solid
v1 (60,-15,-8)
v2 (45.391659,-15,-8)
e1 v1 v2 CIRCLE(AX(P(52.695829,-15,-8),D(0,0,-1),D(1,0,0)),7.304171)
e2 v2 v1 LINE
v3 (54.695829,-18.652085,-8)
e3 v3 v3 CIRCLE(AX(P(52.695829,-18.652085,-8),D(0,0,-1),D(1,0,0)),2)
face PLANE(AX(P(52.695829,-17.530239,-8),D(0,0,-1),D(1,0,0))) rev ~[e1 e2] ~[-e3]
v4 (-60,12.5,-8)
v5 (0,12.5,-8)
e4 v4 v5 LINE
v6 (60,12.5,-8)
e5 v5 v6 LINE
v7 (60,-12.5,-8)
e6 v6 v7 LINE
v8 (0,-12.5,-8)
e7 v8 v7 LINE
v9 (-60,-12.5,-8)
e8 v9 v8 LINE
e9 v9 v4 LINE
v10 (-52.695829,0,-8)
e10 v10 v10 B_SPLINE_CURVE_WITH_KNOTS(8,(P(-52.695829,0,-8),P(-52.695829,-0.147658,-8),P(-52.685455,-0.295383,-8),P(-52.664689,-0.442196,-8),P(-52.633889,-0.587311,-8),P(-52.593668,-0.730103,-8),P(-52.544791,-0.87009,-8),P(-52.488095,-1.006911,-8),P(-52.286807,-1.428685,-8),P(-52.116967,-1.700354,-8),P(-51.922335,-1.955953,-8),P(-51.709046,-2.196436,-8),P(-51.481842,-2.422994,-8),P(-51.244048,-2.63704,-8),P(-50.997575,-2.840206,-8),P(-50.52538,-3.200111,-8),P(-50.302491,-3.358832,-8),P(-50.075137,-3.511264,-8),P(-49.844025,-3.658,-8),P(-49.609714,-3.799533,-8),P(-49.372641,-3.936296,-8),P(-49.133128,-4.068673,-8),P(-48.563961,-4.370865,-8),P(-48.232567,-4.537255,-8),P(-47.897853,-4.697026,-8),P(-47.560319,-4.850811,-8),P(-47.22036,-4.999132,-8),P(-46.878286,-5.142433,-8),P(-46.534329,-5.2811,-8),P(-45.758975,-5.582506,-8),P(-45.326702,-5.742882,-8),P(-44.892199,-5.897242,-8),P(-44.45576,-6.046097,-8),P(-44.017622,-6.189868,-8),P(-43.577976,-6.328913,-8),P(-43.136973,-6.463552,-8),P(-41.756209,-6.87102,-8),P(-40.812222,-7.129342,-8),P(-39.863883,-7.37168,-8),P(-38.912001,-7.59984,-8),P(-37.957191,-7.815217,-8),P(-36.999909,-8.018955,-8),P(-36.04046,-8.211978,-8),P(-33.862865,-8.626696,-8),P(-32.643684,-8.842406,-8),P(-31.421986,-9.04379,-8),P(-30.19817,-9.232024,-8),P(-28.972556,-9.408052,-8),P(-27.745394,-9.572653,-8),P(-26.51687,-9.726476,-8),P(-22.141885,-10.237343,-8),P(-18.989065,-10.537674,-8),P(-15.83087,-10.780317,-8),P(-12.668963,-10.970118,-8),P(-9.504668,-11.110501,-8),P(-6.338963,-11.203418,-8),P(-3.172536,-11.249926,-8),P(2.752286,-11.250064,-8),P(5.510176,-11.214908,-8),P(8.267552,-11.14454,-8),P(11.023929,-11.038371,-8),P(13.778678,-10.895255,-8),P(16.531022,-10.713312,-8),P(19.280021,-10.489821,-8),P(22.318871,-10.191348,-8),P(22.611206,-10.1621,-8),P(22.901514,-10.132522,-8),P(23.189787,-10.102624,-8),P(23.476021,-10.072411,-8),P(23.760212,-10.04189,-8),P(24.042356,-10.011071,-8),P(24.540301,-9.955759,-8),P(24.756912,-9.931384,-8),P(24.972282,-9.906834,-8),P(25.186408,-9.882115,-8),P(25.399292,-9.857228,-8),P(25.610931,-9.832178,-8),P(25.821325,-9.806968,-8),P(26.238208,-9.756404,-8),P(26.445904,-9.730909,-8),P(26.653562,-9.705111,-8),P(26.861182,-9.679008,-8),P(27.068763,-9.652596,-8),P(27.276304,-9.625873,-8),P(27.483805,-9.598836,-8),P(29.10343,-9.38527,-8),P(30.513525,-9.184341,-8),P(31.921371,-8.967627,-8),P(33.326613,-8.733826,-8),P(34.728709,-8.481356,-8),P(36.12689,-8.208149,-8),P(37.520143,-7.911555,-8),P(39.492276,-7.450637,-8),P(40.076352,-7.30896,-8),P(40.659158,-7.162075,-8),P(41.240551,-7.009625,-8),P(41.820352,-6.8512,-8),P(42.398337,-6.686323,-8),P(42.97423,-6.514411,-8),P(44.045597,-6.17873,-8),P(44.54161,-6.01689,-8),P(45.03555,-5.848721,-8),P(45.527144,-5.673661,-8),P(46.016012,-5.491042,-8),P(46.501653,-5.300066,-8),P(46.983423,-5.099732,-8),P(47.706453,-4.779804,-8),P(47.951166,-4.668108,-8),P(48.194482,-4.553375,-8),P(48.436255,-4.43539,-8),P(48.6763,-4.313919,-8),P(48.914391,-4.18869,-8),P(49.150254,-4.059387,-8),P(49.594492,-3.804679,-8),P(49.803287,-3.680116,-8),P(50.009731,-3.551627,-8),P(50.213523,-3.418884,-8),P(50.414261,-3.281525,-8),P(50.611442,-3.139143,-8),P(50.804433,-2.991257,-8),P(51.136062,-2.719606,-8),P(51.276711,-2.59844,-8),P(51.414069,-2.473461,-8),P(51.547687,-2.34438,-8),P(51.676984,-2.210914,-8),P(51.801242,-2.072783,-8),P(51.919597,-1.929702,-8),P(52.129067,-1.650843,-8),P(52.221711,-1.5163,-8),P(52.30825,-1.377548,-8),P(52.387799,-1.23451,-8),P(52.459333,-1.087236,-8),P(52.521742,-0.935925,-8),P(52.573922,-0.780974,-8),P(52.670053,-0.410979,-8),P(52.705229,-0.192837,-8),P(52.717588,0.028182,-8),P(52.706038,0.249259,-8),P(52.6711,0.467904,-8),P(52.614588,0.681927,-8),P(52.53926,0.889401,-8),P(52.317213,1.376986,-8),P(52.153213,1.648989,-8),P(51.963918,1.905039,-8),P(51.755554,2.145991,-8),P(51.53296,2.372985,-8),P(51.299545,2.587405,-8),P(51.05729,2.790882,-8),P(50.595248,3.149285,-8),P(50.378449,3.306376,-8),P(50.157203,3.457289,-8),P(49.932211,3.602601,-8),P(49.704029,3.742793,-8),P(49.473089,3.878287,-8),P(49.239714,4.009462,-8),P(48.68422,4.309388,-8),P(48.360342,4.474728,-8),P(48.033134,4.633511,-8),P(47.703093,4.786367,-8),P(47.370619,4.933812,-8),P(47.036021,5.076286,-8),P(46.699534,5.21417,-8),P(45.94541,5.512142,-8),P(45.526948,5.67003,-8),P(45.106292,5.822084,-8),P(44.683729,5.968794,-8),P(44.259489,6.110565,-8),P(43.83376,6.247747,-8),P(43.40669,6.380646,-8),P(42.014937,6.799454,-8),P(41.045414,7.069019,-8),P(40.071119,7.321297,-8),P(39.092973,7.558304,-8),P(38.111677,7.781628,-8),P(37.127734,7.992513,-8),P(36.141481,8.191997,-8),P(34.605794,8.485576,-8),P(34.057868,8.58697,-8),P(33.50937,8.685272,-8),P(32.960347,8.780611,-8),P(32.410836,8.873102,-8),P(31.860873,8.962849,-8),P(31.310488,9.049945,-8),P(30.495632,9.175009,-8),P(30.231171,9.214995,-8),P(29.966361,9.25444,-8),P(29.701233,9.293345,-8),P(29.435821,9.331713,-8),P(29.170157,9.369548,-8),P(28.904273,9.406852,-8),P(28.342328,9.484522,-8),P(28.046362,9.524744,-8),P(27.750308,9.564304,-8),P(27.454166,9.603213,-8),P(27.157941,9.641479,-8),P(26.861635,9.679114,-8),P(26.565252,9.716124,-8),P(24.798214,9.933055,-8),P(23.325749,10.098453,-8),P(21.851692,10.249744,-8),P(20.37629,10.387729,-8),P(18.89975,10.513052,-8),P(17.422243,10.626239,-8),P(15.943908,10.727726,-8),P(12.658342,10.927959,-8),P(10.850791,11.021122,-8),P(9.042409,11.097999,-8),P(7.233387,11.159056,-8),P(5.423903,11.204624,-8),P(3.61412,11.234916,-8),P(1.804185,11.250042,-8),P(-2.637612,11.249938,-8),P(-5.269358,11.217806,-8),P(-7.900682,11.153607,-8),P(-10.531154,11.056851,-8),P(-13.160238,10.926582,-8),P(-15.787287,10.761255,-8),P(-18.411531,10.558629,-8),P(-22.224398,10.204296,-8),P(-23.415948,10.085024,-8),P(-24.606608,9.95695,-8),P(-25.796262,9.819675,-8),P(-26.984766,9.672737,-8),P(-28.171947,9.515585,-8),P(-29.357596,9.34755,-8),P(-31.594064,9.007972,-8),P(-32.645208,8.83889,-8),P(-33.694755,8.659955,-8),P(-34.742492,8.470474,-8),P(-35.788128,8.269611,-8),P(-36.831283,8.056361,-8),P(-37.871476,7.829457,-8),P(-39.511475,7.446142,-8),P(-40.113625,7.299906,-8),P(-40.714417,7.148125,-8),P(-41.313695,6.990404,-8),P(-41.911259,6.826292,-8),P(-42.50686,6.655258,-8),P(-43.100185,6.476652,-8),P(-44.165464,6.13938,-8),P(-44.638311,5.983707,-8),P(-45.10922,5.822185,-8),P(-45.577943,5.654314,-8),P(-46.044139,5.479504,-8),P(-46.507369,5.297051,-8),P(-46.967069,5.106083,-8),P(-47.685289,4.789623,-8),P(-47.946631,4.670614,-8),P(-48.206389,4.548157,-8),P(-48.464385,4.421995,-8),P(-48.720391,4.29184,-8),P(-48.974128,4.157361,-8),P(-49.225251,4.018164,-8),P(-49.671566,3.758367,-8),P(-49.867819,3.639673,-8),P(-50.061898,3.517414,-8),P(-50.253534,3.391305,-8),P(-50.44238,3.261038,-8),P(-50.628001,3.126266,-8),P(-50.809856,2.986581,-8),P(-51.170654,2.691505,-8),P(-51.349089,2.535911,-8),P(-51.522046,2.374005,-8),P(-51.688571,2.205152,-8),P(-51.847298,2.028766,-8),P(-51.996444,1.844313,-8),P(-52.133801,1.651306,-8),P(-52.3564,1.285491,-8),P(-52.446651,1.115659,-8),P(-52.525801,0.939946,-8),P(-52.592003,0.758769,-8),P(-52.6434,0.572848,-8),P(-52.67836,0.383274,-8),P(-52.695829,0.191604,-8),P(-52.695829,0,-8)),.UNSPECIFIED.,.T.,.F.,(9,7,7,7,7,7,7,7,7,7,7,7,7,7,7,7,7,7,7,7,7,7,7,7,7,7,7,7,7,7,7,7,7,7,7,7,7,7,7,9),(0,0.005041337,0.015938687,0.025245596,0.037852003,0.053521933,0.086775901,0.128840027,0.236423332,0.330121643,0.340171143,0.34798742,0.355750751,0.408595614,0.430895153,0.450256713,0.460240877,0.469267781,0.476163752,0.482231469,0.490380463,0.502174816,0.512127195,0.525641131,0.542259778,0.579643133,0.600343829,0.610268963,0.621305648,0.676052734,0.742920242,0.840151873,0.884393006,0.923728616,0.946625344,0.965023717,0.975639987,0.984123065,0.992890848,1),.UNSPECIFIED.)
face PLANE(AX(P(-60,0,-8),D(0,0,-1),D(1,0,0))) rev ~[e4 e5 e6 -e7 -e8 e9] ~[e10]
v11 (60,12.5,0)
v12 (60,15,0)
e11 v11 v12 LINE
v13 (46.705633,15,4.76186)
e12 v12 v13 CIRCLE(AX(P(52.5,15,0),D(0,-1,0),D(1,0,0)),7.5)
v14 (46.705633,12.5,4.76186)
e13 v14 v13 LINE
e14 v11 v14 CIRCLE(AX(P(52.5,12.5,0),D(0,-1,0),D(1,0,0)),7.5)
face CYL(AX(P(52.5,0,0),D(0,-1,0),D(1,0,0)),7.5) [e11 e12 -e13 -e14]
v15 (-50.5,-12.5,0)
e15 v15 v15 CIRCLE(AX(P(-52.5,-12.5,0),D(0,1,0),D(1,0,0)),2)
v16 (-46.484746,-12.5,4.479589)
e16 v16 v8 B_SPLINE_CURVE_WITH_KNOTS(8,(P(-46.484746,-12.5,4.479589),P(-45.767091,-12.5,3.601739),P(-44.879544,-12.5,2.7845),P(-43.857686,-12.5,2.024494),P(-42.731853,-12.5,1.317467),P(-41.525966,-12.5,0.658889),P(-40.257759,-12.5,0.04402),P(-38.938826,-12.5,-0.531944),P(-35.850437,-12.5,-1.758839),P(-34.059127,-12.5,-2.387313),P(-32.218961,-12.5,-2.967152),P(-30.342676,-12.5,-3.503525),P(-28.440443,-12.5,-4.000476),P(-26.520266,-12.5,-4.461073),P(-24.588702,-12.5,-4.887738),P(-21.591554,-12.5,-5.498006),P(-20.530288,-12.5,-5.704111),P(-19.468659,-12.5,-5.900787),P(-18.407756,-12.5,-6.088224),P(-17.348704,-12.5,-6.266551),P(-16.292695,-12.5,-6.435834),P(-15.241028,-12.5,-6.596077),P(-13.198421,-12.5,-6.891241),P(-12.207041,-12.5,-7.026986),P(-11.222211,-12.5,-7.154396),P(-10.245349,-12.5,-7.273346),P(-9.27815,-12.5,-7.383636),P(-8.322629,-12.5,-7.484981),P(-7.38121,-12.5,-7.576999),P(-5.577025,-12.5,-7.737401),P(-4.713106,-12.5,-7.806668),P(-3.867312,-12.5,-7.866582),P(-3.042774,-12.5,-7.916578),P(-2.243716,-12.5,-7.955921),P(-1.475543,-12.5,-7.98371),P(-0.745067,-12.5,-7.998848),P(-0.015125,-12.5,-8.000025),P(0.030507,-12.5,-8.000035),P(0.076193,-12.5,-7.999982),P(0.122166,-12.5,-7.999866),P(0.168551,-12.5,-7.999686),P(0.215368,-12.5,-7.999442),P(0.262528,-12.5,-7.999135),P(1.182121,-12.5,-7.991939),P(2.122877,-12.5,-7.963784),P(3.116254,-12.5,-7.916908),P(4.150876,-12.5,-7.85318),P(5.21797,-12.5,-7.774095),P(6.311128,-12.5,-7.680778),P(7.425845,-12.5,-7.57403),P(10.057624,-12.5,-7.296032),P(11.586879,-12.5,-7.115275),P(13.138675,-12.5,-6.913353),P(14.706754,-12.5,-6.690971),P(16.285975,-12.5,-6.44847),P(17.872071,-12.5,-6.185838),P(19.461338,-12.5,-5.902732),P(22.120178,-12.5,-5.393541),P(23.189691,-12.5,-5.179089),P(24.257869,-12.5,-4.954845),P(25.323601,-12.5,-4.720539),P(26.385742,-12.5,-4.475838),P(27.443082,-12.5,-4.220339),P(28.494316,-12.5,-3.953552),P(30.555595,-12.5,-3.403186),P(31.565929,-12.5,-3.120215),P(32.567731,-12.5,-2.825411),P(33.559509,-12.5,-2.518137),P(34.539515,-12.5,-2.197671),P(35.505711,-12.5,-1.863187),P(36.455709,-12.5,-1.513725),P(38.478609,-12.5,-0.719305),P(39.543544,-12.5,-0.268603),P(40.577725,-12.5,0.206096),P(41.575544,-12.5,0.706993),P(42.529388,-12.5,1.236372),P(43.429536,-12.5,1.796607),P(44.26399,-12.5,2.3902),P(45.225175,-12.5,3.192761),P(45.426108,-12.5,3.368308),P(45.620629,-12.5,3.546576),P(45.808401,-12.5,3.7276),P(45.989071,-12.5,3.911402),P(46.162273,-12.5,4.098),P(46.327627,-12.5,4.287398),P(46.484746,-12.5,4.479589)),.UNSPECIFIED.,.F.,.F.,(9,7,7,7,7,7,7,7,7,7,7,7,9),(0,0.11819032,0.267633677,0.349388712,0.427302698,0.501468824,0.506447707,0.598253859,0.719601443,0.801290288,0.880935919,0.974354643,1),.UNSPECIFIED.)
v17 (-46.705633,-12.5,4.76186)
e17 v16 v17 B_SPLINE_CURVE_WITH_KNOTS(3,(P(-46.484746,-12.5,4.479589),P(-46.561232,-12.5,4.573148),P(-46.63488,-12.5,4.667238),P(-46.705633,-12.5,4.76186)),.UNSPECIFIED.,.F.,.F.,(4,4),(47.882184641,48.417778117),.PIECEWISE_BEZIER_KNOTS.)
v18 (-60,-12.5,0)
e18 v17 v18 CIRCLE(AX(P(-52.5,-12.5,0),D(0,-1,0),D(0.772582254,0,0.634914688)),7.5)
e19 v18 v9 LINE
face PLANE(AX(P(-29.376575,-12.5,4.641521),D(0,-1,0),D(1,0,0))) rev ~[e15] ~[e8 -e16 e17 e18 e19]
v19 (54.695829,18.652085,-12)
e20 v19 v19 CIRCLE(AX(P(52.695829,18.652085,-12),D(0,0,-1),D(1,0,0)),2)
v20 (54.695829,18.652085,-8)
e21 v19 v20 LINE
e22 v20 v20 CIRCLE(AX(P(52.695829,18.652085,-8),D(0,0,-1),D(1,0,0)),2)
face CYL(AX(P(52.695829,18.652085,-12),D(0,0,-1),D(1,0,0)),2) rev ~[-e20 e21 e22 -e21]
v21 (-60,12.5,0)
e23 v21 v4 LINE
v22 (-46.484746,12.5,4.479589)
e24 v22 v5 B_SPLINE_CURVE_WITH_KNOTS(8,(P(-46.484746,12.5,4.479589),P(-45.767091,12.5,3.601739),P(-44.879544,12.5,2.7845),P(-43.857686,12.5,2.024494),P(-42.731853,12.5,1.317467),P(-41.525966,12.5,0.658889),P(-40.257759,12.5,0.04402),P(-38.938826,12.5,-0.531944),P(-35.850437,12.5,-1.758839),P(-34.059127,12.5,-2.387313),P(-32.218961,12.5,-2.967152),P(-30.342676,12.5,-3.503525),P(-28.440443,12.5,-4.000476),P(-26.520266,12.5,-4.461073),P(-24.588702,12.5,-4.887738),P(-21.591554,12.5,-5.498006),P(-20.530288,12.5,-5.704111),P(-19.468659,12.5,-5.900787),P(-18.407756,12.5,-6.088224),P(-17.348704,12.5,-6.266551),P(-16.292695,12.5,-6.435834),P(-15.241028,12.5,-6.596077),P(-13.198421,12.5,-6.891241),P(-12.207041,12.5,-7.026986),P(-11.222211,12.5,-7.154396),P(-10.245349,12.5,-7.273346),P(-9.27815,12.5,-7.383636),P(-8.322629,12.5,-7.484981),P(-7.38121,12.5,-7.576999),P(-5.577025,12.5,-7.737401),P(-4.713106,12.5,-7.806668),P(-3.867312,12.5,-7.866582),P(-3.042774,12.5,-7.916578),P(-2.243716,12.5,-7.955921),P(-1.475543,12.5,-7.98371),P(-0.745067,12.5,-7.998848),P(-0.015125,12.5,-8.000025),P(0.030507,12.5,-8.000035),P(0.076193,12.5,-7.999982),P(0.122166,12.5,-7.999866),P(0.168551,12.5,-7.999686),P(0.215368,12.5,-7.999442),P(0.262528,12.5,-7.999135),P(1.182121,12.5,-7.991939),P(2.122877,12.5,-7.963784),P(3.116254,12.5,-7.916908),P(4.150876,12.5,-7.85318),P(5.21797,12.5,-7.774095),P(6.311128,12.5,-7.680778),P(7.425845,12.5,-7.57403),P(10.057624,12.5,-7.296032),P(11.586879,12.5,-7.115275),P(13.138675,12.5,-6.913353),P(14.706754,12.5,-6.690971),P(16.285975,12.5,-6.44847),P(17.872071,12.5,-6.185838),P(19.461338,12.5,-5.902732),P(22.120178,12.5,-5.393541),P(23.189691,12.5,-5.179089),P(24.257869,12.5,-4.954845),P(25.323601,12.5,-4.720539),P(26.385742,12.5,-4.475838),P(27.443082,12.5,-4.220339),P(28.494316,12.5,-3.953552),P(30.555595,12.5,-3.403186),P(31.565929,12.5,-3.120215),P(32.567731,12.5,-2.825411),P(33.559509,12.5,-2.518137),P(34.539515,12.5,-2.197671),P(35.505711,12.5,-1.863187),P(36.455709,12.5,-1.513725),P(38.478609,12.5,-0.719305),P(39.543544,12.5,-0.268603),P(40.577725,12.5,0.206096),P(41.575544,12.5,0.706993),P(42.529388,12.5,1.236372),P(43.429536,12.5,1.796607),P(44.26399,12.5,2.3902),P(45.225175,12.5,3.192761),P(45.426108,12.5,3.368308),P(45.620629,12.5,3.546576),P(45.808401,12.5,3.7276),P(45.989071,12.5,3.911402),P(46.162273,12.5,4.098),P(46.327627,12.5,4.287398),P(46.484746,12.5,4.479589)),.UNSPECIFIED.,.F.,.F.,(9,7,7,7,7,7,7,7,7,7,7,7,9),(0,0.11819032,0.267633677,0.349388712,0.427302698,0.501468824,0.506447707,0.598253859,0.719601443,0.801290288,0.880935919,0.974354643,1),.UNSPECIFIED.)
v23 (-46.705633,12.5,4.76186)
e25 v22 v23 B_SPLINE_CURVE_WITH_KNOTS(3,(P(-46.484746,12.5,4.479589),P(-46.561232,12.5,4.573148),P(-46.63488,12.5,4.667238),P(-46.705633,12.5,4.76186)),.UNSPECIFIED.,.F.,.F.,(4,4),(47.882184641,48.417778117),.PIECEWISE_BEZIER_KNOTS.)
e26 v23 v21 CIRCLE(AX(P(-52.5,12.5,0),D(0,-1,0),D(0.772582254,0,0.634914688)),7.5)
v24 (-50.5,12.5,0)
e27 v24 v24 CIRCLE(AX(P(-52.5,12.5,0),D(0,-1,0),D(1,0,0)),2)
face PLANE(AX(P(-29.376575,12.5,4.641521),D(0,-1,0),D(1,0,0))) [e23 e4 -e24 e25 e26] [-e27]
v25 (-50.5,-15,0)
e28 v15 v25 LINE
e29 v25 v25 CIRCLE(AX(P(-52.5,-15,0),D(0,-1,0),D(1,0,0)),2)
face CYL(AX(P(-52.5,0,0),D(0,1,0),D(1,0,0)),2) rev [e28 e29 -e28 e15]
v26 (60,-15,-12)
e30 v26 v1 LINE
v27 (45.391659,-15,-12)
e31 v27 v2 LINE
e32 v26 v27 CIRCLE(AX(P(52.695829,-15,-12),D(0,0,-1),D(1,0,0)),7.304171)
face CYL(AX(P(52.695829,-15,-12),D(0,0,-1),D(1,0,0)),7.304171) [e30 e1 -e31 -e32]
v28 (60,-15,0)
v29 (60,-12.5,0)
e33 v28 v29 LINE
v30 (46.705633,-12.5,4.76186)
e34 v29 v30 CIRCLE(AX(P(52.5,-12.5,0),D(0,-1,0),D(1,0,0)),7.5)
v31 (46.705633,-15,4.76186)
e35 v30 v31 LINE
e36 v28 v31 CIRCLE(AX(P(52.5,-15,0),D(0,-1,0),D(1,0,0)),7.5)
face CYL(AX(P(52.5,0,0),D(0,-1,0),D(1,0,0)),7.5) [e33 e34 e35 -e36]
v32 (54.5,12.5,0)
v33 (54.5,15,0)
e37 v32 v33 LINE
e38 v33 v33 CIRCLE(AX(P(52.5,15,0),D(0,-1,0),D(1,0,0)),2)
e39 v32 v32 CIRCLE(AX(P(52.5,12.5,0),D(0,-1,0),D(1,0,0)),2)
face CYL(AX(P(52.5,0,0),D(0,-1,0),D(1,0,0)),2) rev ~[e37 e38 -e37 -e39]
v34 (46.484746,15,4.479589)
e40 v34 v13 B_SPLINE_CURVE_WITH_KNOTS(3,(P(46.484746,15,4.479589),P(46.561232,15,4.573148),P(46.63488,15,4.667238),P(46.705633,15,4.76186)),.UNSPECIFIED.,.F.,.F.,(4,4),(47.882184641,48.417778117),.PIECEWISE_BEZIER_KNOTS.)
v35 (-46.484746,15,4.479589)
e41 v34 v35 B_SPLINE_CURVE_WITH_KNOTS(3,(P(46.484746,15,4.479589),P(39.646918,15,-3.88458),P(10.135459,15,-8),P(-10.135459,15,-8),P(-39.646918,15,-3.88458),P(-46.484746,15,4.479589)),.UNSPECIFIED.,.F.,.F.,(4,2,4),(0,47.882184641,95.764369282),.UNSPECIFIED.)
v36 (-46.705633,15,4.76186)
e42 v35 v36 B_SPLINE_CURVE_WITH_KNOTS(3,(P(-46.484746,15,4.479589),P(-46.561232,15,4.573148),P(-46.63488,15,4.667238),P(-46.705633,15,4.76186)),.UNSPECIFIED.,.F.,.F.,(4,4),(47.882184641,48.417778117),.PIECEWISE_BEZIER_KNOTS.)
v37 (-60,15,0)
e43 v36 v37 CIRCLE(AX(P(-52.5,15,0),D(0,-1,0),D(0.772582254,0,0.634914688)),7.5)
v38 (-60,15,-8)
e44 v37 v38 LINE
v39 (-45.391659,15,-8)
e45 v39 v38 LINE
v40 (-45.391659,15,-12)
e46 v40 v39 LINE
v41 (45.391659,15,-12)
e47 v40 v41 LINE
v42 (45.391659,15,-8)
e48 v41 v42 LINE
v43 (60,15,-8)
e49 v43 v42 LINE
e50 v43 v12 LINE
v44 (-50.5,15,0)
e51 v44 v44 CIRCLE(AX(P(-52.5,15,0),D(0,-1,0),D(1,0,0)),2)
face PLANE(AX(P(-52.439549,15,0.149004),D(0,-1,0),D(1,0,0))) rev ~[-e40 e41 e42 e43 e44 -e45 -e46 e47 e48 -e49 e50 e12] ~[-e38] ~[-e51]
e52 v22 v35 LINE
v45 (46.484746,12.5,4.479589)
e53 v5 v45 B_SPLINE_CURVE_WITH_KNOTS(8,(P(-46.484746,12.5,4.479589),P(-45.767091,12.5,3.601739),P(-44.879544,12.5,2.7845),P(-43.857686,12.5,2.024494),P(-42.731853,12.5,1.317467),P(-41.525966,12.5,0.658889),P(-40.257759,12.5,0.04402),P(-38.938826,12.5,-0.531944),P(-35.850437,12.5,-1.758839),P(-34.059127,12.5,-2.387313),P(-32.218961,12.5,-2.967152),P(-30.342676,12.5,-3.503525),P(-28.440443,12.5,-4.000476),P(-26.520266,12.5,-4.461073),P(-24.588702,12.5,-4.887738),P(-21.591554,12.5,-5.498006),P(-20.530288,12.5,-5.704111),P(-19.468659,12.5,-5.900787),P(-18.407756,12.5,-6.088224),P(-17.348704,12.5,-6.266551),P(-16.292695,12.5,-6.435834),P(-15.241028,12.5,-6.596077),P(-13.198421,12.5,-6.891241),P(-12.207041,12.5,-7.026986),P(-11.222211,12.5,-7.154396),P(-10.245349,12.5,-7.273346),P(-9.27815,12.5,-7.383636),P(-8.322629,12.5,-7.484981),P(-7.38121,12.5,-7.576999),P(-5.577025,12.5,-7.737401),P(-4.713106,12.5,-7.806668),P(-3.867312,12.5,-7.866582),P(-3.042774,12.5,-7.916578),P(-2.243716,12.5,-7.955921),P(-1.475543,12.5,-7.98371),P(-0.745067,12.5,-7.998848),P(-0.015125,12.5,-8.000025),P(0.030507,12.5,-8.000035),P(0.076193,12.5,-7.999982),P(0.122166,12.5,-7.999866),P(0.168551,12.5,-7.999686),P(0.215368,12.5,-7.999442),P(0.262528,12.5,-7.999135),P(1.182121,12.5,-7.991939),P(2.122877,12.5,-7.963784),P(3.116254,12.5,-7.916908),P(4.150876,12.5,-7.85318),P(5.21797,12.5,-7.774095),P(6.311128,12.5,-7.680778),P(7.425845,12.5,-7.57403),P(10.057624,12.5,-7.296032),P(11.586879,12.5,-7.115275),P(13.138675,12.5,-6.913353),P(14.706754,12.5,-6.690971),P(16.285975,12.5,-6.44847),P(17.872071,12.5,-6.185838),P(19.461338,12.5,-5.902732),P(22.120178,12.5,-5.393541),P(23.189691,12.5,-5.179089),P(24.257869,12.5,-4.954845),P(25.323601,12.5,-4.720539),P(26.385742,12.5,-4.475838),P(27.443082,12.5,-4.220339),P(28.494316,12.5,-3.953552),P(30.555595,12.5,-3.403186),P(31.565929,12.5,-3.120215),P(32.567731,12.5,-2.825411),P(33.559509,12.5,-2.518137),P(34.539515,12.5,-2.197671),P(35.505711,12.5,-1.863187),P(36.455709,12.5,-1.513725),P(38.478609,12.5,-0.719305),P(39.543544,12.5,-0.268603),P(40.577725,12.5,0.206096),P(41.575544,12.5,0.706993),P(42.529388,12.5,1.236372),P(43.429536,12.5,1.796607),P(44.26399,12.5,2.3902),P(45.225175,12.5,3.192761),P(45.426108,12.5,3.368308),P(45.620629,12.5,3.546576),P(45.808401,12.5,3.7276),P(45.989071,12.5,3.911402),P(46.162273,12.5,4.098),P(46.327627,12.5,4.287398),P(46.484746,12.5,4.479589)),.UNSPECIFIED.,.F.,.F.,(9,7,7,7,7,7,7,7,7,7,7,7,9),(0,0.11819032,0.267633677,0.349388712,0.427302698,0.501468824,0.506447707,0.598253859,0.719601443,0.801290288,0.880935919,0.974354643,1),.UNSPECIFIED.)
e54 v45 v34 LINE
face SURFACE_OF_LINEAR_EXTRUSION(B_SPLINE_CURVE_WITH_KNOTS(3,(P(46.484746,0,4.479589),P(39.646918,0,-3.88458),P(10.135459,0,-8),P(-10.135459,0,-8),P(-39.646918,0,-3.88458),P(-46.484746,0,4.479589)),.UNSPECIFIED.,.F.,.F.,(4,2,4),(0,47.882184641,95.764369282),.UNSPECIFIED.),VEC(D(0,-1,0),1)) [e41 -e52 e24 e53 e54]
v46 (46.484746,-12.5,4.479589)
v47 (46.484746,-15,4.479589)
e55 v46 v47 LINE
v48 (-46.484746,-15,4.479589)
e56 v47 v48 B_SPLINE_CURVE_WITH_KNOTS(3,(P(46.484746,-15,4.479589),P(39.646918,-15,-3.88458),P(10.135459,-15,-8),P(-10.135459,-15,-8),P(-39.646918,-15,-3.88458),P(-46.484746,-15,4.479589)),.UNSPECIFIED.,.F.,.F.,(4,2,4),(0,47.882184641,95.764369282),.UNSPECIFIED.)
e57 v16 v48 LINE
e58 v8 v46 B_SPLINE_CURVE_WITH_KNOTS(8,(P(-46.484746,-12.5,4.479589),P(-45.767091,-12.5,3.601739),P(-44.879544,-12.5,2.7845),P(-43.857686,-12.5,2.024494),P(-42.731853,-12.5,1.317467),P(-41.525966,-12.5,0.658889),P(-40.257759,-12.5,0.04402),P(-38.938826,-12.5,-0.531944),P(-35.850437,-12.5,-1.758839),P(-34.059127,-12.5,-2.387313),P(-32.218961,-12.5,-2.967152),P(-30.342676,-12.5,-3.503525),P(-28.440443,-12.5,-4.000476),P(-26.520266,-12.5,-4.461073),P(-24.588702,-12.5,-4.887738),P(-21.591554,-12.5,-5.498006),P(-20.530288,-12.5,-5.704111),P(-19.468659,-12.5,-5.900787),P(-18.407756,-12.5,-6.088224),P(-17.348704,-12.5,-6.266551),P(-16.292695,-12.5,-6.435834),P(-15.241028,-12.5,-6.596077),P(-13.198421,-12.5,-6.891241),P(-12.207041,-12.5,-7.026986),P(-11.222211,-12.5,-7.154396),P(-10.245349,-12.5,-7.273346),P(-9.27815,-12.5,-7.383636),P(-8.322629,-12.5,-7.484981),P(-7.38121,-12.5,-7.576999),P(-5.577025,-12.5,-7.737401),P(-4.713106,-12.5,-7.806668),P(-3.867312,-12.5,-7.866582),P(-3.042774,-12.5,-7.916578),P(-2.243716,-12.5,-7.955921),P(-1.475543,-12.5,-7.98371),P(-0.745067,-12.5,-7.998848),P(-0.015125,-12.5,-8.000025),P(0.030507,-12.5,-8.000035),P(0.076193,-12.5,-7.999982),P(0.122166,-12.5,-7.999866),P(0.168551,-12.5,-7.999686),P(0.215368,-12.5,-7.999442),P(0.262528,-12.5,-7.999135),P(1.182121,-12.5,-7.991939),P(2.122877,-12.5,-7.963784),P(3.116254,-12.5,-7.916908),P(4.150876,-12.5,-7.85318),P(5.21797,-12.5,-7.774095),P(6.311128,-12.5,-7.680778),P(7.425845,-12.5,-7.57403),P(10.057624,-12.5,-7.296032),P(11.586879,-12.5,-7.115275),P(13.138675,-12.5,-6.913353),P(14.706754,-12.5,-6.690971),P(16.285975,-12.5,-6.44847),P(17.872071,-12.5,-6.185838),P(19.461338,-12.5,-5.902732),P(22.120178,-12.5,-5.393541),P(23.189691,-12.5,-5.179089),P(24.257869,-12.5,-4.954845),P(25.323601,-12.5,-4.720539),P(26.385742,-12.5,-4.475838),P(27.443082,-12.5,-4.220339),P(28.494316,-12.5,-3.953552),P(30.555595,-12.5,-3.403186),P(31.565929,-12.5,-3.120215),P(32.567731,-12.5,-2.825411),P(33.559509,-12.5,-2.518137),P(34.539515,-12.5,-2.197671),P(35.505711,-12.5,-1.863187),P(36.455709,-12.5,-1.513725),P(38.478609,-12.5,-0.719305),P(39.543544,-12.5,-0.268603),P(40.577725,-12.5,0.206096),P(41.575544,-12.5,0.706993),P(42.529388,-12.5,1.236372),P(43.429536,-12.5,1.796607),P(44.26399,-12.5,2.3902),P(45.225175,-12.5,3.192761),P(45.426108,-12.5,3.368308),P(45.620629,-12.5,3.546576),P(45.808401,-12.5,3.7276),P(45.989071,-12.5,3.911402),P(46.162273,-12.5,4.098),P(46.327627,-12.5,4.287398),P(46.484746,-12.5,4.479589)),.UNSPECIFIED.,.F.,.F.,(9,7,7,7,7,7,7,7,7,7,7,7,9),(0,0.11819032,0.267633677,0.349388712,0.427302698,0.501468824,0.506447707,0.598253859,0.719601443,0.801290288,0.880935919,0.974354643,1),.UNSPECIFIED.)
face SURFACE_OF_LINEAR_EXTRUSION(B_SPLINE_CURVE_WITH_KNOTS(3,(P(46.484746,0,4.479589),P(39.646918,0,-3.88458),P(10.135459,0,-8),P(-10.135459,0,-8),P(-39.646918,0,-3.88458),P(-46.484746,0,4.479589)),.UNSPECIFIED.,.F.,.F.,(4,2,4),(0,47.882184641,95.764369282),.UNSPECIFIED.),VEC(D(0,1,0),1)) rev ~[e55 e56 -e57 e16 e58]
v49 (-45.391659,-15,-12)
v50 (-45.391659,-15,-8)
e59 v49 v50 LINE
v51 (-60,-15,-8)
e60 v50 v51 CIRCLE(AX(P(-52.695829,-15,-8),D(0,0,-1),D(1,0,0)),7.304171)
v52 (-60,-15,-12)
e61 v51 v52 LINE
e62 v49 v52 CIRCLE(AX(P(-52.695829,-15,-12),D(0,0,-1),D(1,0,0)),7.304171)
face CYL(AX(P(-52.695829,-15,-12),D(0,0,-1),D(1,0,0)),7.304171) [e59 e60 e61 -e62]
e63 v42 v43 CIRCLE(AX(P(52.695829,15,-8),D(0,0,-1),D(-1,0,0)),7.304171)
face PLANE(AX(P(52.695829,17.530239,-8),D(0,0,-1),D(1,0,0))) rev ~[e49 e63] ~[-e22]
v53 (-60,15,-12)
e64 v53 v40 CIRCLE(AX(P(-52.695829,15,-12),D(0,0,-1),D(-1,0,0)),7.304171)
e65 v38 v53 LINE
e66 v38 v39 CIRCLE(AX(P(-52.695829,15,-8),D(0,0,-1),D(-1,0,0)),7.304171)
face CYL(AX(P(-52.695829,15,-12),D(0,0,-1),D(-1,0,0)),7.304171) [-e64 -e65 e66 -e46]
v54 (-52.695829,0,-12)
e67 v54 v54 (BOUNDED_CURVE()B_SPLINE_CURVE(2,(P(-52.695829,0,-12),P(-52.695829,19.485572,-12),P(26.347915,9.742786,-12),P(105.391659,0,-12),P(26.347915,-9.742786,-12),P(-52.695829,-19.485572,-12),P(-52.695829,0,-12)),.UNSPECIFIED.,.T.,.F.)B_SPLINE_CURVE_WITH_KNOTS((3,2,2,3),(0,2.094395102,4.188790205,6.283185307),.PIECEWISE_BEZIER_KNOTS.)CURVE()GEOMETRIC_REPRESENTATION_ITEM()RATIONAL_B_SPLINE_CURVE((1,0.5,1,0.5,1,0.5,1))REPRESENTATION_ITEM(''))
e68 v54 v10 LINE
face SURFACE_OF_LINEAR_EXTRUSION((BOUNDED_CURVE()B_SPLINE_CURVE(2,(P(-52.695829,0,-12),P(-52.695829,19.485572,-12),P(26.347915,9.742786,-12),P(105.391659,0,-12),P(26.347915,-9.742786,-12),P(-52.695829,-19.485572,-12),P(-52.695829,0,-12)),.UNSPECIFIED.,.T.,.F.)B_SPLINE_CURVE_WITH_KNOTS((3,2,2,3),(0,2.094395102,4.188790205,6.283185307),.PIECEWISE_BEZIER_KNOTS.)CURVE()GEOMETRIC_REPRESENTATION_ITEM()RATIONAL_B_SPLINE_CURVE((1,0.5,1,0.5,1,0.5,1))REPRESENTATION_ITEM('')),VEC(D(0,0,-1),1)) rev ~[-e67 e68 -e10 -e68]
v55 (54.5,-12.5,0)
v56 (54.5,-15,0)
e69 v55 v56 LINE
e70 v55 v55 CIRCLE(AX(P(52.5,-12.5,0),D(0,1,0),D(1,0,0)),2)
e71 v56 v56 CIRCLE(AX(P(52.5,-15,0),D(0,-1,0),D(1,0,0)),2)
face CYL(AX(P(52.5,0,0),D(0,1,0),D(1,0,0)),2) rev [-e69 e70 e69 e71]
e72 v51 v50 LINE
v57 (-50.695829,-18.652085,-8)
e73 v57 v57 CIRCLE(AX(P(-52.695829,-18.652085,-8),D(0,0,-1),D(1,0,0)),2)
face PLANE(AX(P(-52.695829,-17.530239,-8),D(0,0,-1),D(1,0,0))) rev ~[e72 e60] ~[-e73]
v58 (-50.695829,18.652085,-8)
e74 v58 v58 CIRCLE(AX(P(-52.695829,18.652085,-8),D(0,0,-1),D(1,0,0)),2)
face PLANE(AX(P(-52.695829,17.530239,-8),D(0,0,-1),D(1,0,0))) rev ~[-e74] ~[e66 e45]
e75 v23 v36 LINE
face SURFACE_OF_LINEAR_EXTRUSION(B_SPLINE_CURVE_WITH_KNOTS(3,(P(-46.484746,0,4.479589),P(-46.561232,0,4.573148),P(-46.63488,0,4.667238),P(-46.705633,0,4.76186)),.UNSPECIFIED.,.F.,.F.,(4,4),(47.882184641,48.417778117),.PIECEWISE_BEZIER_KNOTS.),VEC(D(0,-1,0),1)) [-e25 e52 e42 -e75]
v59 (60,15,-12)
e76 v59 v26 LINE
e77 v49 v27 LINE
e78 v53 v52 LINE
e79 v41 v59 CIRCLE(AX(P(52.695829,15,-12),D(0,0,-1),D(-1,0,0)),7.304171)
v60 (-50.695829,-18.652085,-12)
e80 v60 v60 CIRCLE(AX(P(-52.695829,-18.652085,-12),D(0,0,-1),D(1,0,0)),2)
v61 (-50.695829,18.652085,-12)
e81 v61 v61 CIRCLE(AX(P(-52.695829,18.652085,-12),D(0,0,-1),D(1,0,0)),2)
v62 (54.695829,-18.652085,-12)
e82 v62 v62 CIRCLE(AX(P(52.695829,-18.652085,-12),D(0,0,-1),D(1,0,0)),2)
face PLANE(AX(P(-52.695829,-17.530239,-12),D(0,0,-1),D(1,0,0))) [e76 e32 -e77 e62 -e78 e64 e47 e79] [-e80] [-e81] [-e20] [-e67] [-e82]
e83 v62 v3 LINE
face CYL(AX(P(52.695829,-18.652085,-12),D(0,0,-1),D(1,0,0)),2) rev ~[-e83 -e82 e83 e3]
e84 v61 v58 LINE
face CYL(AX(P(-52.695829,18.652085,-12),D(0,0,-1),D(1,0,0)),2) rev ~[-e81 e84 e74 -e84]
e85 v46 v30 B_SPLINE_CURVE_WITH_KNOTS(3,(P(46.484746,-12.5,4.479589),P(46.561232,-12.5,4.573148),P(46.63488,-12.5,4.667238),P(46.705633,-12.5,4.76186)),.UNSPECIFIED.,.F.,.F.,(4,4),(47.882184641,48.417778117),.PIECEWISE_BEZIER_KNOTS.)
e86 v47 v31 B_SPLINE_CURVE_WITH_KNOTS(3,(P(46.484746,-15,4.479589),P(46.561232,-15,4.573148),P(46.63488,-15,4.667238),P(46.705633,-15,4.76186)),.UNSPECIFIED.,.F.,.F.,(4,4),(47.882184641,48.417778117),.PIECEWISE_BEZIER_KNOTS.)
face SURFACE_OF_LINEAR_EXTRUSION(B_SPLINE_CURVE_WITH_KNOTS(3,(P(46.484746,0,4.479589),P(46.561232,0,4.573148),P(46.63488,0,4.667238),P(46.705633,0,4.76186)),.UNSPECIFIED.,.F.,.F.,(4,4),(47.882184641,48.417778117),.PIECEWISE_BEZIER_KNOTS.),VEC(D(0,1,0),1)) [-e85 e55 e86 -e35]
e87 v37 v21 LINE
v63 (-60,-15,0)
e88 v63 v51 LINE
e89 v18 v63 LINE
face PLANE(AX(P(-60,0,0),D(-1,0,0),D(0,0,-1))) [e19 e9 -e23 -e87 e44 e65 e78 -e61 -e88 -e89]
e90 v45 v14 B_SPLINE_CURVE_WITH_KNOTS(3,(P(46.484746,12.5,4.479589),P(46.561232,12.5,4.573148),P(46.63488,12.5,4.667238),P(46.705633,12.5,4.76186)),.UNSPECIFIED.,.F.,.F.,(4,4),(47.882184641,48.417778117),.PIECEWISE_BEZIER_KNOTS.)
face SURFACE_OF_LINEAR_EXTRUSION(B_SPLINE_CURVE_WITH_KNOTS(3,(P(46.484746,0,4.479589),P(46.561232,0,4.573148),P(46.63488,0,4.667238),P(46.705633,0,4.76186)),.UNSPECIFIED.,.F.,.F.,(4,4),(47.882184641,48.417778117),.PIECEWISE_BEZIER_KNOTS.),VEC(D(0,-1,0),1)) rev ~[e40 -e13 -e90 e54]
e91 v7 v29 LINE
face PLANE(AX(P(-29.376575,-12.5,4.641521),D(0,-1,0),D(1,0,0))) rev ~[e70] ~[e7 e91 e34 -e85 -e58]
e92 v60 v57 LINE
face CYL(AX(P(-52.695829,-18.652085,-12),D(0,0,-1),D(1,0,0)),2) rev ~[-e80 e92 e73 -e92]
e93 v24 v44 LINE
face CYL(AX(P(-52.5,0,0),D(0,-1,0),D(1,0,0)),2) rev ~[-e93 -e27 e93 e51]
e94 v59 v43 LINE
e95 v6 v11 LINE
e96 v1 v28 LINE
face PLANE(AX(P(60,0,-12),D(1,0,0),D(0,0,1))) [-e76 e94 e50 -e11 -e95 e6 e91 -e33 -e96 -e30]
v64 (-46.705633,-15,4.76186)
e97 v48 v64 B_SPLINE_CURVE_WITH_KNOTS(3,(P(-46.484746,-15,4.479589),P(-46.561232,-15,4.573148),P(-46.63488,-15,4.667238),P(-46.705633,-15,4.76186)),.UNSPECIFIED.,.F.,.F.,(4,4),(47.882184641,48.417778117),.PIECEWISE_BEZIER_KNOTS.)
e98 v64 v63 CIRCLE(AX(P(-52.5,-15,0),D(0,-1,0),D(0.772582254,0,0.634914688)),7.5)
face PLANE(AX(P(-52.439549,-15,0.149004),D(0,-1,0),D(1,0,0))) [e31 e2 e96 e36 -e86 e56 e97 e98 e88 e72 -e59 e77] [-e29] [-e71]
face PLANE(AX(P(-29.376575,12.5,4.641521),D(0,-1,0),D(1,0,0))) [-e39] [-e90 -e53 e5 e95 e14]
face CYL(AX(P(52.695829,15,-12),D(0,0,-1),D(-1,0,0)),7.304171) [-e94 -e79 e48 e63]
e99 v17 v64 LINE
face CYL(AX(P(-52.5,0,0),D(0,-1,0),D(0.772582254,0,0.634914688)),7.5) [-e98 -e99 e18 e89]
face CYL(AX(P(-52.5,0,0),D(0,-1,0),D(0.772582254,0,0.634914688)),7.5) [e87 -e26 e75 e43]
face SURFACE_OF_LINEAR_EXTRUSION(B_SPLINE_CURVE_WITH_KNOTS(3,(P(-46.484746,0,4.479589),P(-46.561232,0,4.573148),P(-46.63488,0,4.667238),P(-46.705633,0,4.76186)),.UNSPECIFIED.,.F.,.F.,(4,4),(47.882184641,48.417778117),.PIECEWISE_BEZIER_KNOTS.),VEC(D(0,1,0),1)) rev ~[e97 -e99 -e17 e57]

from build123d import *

# Parameters (mm, degrees)
F1_R     = 2
F1_W     = 60
F1_H     = 4
F2_DEPTH = 15
F3_DEPTH = 12.5
F4_R     = 2
F5_DEPTH = 4
F6_DEPTH = 25


with BuildPart() as f2:
    # F1 (on Front) → F2 (new body, symmetric)
    with BuildSketch(Plane.XZ):
        with BuildLine():
            add(Edge.make_bspline(
                [(-46.484745939, 4.4795891086), (-46.5612315065, 4.5731477989), (-46.6348801759, 4.6672380877), (-46.7056330974, 4.7618601615)],
                knots=[47.882184641, 47.882184641, 47.882184641, 47.882184641, 48.4177781173, 48.4177781173, 48.4177781173, 48.4177781173], degree=3))
            ThreePointArc((-46.7056330974, 4.7618601615), (-55.0290559731, 7.0607277164), (-60, 0))
            ThreePointArc((-60, 0), (-52.5, -7.5), (-45, 0))
            ThreePointArc((-45, 0), (-45.3808566015, 2.3596180351), (-46.484745939, 4.4795891086))
        make_face()
        with Locations((-52.5, 0)):
            Circle(F1_R, mode=Mode.SUBTRACT)
        with BuildLine():
            ThreePointArc((-45, 0), (-52.5, -7.5), (-60, 0))
            Line((-60, 0), (-60, -8))
            Line((-60, -8), (0, -8))
            add(Edge.make_bspline(
                [(0, -8), (-10.1354588221, -8), (-39.6469179504, -3.8845801368), (-46.484745939, 4.4795891086)],
                knots=[0, 0, 0, 0, 47.882184641, 47.882184641, 47.882184641, 47.882184641], degree=3))
            ThreePointArc((-46.484745939, 4.4795891086), (-45.3808566015, 2.3596180351), (-45, 0))
        make_face()
        with Locations((-30, -10)):
            Rectangle(F1_W, F1_H)
        with Locations((30, -10)):
            Rectangle(F1_W, F1_H)
        with BuildLine():
            add(Edge.make_bspline(
                [(0, -8), (10.1354588221, -8), (39.6469179504, -3.8845801368), (46.484745939, 4.4795891086)],
                knots=[0, 0, 0, 0, 47.882184641, 47.882184641, 47.882184641, 47.882184641], degree=3))
            Line((0, -8), (60, -8))
            Line((60, -8), (60, 0))
            ThreePointArc((60, 0), (50.1403819649, -7.1191433985), (46.484745939, 4.4795891086))
        make_face()
        with BuildLine():
            add(Edge.make_bspline(
                [(46.484745939, 4.4795891086), (46.5612315065, 4.5731477989), (46.6348801759, 4.6672380877), (46.7056330974, 4.7618601615)],
                knots=[47.882184641, 47.882184641, 47.882184641, 47.882184641, 48.4177781173, 48.4177781173, 48.4177781173, 48.4177781173], degree=3))
            ThreePointArc((46.484745939, 4.4795891086), (50.1403819649, -7.1191433985), (60, 0))
            ThreePointArc((60, 0), (55.0290559731, 7.0607277164), (46.7056330974, 4.7618601615))
        make_face()
        with Locations((52.5, 0)):
            Circle(F1_R, mode=Mode.SUBTRACT)
    extrude(amount=F2_DEPTH, both=True)

    # F1 (on Front) → F3 (cut, symmetric)
    with BuildSketch(Plane.XZ):
        with BuildLine():
            ThreePointArc((-60, 0), (-55.0290559731, 7.0607277164), (-46.7056330974, 4.7618601615))
            ThreePointArc((-46.7056330974, 4.7618601615), (-46.5935030634, 4.6220443461), (-46.484745939, 4.4795891086))
            add(Edge.make_bspline(
                [(0, -8), (-10.1354588221, -8), (-39.6469179504, -3.8845801368), (-46.484745939, 4.4795891086)],
                knots=[0, 0, 0, 0, 47.882184641, 47.882184641, 47.882184641, 47.882184641], degree=3))
            Line((0, -8), (0, 11.9387255982))
            Line((0, 11.9387255982), (-60, 11.9387255982))
            Line((-60, 11.9387255982), (-60, 0))
        make_face()
        with BuildLine():
            Line((0, 11.9387255982), (0, -8))
            add(Edge.make_bspline(
                [(0, -8), (10.1354588221, -8), (39.6469179504, -3.8845801368), (46.484745939, 4.4795891086)],
                knots=[0, 0, 0, 0, 47.882184641, 47.882184641, 47.882184641, 47.882184641], degree=3))
            ThreePointArc((46.484745939, 4.4795891086), (46.5935030634, 4.6220443461), (46.7056330974, 4.7618601615))
            ThreePointArc((46.7056330974, 4.7618601615), (55.0290559731, 7.0607277164), (60, 0))
            Line((60, 0), (60, 11.9387255982))
            Line((60, 11.9387255982), (0, 11.9387255982))
        make_face()
        with BuildLine():
            ThreePointArc((-45, 0), (-52.5, -7.5), (-60, 0))
            Line((-60, 0), (-60, -8))
            Line((-60, -8), (0, -8))
            add(Edge.make_bspline(
                [(0, -8), (-10.1354588221, -8), (-39.6469179504, -3.8845801368), (-46.484745939, 4.4795891086)],
                knots=[0, 0, 0, 0, 47.882184641, 47.882184641, 47.882184641, 47.882184641], degree=3))
            ThreePointArc((-46.484745939, 4.4795891086), (-45.3808566015, 2.3596180351), (-45, 0))
        make_face()
        with BuildLine():
            add(Edge.make_bspline(
                [(0, -8), (10.1354588221, -8), (39.6469179504, -3.8845801368), (46.484745939, 4.4795891086)],
                knots=[0, 0, 0, 0, 47.882184641, 47.882184641, 47.882184641, 47.882184641], degree=3))
            Line((0, -8), (60, -8))
            Line((60, -8), (60, 0))
            ThreePointArc((60, 0), (50.1403819649, -7.1191433985), (46.484745939, 4.4795891086))
        make_face()
        with BuildLine():
            add(Edge.make_bspline(
                [(-46.484745939, 4.4795891086), (-46.5612315065, 4.5731477989), (-46.6348801759, 4.6672380877), (-46.7056330974, 4.7618601615)],
                knots=[47.882184641, 47.882184641, 47.882184641, 47.882184641, 48.4177781173, 48.4177781173, 48.4177781173, 48.4177781173], degree=3))
            ThreePointArc((-46.7056330974, 4.7618601615), (-55.0290559731, 7.0607277164), (-60, 0))
            ThreePointArc((-60, 0), (-52.5, -7.5), (-45, 0))
            ThreePointArc((-45, 0), (-45.3808566015, 2.3596180351), (-46.484745939, 4.4795891086))
        make_face()
        with Locations((-52.5, 0)):
            Circle(F1_R, mode=Mode.SUBTRACT)
        with BuildLine():
            add(Edge.make_bspline(
                [(46.484745939, 4.4795891086), (46.5612315065, 4.5731477989), (46.6348801759, 4.6672380877), (46.7056330974, 4.7618601615)],
                knots=[47.882184641, 47.882184641, 47.882184641, 47.882184641, 48.4177781173, 48.4177781173, 48.4177781173, 48.4177781173], degree=3))
            ThreePointArc((46.484745939, 4.4795891086), (50.1403819649, -7.1191433985), (60, 0))
            ThreePointArc((60, 0), (55.0290559731, 7.0607277164), (46.7056330974, 4.7618601615))
        make_face()
        with Locations((52.5, 0)):
            Circle(F1_R, mode=Mode.SUBTRACT)
        with Locations((-52.5, 0)):
            Circle(F1_R)
        with Locations((52.5, 0)):
            Circle(F1_R)
    extrude(amount=F3_DEPTH, both=True, mode=Mode.SUBTRACT)

    # F4 (on face) → F5 (join)
    with BuildSketch(Plane(origin=(0, 0, -12), x_dir=(1, 0, 0), z_dir=(0, 0, -1))):
        with BuildLine():
            Line((-60, 15), (-45.3916588426, 15))
            ThreePointArc((-45.3916588426, 15), (-52.6958294213, 22.3041705787), (-60, 15))
        make_face()
        with Locations((-52.6958294213, 18.6520852894)):
            Circle(F4_R, mode=Mode.SUBTRACT)
        with BuildLine():
            Line((-45.3916588426, -15), (-60, -15))
            ThreePointArc((-60, -15), (-52.6958294213, -22.3041705787), (-45.3916588426, -15))
        make_face()
        with Locations((-52.6958294213, -18.6520852894)):
            Circle(F4_R, mode=Mode.SUBTRACT)
        with BuildLine():
            ThreePointArc((60, 15), (52.6958294213, 22.3041705787), (45.3916588426, 15))
            Line((45.3916588426, 15), (60, 15))
        make_face()
        with Locations((52.6958294213, 18.6520852894)):
            Circle(F4_R, mode=Mode.SUBTRACT)
        with BuildLine():
            ThreePointArc((45.3916588426, -15), (52.6958294213, -22.3041705787), (60, -15))
            Line((60, -15), (45.3916588426, -15))
        make_face()
        with Locations((52.6958294213, -18.6520852894)):
            Circle(F4_R, mode=Mode.SUBTRACT)
    extrude(amount=-F5_DEPTH)

    # F4 (on face) → F6 (cut)
    with BuildSketch(Plane(origin=(0, 0, -12), x_dir=(1, 0, 0), z_dir=(0, 0, -1))):
        with BuildLine():
            add(Edge.make_bspline(
                [(-52.6958294213, 0), (-52.6958294213, -19.4855715851), (26.3479147106, -9.7427857926), (105.3916588426, 0), (26.3479147106, 9.7427857926), (-52.6958294213, 19.4855715851), (-52.6958294213, 0)],
                knots=[0, 0, 0, 2.0943951024, 2.0943951024, 4.1887902048, 4.1887902048, 6.2831853072, 6.2831853072, 6.2831853072], degree=2, weights=[1, 0.5, 1, 0.5, 1, 0.5, 1]))
        make_face()
    extrude(amount=-F6_DEPTH, mode=Mode.SUBTRACT)


solid = f2.part
